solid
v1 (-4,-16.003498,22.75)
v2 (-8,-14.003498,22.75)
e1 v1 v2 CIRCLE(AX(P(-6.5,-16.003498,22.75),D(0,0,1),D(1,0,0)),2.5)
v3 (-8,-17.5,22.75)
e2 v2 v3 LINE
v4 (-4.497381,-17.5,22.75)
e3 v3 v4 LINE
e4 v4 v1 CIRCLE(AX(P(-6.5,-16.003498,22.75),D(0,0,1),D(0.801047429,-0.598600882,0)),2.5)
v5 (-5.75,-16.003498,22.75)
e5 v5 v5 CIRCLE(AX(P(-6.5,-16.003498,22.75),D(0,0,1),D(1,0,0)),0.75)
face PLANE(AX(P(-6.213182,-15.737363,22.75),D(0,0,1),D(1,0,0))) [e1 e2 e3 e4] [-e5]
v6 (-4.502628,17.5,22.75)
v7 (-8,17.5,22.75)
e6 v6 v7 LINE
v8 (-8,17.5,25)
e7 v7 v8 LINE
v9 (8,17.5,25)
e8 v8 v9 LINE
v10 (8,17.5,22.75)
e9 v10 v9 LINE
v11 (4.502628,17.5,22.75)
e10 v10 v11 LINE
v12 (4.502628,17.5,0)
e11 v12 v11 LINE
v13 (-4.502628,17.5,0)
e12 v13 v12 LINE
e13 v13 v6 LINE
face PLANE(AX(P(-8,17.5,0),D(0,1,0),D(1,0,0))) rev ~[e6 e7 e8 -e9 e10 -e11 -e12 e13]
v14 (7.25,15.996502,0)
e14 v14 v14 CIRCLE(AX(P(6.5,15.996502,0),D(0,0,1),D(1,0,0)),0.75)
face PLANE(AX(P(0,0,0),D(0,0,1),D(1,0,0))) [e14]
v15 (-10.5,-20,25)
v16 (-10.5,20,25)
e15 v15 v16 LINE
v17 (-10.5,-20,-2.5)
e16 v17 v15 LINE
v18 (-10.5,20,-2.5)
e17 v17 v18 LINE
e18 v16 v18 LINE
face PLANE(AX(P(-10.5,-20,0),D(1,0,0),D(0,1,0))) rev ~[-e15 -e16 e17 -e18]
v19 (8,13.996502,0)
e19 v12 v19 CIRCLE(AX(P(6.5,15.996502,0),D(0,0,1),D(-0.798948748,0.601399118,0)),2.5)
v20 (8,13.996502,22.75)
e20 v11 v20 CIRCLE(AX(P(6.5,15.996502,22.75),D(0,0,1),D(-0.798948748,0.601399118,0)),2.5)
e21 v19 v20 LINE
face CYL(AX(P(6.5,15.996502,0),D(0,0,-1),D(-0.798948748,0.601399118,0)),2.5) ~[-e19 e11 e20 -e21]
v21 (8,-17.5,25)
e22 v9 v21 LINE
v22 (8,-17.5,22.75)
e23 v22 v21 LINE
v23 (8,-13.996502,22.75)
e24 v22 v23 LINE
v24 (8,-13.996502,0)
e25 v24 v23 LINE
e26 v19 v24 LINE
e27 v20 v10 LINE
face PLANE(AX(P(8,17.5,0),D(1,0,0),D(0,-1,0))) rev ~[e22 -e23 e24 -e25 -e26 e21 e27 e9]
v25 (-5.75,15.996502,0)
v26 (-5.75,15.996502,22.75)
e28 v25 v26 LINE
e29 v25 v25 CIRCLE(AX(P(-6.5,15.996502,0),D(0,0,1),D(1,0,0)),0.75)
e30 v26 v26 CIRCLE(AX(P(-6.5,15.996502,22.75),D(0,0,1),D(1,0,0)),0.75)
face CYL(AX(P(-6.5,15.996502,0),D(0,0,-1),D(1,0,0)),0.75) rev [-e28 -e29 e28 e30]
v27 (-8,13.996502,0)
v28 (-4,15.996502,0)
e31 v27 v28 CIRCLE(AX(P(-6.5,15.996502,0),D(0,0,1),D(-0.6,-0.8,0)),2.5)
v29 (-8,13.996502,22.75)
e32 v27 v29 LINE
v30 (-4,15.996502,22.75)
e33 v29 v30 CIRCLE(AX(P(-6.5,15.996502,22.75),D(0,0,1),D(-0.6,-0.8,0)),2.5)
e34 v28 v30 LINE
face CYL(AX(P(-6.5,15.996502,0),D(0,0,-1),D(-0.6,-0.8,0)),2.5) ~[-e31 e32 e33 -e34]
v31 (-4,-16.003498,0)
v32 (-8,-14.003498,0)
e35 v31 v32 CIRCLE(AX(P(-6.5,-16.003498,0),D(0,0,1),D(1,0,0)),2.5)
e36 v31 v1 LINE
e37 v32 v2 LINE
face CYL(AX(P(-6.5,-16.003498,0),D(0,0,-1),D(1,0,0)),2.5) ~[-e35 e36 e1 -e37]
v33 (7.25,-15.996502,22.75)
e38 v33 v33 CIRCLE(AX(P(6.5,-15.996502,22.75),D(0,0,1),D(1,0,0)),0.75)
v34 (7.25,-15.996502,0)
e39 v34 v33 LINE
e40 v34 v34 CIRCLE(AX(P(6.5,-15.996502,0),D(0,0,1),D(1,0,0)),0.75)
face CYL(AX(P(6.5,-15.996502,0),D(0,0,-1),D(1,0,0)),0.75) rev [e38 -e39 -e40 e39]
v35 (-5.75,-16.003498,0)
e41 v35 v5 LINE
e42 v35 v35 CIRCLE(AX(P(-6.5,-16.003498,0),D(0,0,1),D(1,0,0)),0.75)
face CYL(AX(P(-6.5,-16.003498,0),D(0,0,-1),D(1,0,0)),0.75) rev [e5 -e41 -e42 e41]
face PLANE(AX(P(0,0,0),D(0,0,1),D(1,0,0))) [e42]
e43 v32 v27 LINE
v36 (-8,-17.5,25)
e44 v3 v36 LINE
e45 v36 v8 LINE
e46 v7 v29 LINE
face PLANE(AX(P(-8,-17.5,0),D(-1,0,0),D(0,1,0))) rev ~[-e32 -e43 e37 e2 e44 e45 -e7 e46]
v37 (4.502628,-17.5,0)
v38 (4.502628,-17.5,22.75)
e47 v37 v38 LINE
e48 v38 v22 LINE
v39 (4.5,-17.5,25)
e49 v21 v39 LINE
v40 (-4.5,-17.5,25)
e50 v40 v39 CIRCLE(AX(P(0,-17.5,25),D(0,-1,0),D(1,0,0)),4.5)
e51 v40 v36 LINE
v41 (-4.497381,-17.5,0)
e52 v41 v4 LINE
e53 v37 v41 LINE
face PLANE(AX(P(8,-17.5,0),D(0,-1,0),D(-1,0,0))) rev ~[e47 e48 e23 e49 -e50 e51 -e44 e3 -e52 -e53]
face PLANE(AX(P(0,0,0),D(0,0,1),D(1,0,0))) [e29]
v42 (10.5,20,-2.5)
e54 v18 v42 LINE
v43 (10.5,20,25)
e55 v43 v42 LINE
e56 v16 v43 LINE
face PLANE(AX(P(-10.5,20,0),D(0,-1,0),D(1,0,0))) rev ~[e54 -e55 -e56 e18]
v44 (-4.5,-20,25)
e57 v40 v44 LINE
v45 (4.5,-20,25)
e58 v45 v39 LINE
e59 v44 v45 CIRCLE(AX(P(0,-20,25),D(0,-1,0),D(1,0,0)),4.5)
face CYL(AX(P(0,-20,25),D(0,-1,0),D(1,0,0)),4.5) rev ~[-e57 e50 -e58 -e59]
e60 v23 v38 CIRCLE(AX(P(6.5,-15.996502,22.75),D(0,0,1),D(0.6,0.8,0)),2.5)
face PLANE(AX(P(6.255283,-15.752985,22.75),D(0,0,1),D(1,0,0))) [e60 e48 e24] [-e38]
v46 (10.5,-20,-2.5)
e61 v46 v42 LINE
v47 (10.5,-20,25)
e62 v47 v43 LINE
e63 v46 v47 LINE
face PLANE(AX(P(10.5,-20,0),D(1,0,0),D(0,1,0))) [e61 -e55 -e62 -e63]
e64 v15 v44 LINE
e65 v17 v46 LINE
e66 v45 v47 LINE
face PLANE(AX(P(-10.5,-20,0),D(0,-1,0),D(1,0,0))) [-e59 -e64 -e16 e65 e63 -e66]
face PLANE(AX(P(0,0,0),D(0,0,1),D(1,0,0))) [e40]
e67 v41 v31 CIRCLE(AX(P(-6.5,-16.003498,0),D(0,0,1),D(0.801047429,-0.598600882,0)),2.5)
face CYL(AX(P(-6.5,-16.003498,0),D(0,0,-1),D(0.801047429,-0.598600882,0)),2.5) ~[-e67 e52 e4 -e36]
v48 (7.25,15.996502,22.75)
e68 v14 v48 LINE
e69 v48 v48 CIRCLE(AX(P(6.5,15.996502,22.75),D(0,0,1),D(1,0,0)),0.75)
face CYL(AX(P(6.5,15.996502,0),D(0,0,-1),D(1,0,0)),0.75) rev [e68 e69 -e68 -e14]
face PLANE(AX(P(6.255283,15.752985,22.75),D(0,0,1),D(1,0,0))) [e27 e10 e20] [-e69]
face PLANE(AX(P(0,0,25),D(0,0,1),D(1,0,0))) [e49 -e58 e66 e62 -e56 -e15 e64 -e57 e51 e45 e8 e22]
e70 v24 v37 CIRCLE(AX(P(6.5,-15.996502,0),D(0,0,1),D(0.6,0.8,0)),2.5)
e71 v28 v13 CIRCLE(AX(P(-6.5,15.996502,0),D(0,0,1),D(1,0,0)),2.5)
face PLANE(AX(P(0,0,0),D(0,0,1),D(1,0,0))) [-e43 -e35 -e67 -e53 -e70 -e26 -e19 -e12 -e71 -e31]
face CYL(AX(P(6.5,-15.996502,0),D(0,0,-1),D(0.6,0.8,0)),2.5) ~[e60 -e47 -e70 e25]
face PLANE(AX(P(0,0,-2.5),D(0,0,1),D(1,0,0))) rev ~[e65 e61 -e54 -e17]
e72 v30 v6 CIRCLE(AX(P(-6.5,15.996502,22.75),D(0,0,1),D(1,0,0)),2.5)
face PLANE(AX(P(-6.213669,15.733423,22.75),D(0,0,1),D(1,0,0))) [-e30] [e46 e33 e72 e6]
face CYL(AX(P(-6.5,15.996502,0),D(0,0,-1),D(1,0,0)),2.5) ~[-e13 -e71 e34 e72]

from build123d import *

# Parameters (mm, degrees)
F0_W     = 21
F0_H     = 40
F1_DEPTH = 25
F0_R     = 0.75
F2_DEPTH = 22.75
F3_W     = 21
F3_H     = 40
F4_DEPTH = 2.5
F5_R     = 4.5
F6_DEPTH = 2.5


# Not quite as in the source:
# - a feature names something its author has since deleted; it is built from what else it names


with BuildPart() as f1:
    # F0 (on Top) → F1 (new body)
    with BuildSketch(Plane.XY):
        Rectangle(F0_W, F0_H)
        with BuildLine():
            ThreePointArc((-8, 13.996502206), (-8.2693131131, 17.7627216453), (-4.5026281309, 17.5))
            Line((-4.5026281309, 17.5), (4.5026281309, 17.5))
            ThreePointArc((4.5026281309, 17.5), (7.2926444119, 18.3675177766), (9, 15.996502206))
            ThreePointArc((9, 15.996502206), (8.7360679775, 14.8784682172), (8, 13.996502206))
            Line((8, 13.996502206), (8, -13.9965024172))
            ThreePointArc((8, -13.9965024172), (8.7360679775, -14.8784684285), (9, -15.9965024172))
            ThreePointArc((9, -15.9965024172), (7.2926442865, -18.3675180298), (4.5026279719, -17.5))
            Line((4.5026279719, -17.5), (-4.4973814273, -17.5))
            ThreePointArc((-4.4973814273, -17.5), (-8.2662214687, -17.7728088813), (-8, -14.003497794))
            Line((-8, -14.003497794), (-8, 13.996502206))
        make_face(mode=Mode.SUBTRACT)
        with BuildLine():
            Line((-8, -17.5), (-8, -14.003497794))
            ThreePointArc((-8, -14.003497794), (-8.2662214687, -17.7728088813), (-4.4973814273, -17.5))
            Line((-4.4973814273, -17.5), (-8, -17.5))
        make_face()
        with BuildLine():
            Line((-8, 13.996502206), (-8, 17.5))
            Line((-8, 17.5), (-4.5026281309, 17.5))
            ThreePointArc((-4.5026281309, 17.5), (-8.2693131131, 17.7627216453), (-8, 13.996502206))
        make_face()
        with BuildLine():
            ThreePointArc((9, 15.996502206), (7.2926444119, 18.3675177766), (4.5026281309, 17.5))
            Line((4.5026281309, 17.5), (8, 17.5))
            Line((8, 17.5), (8, 13.996502206))
            ThreePointArc((8, 13.996502206), (8.7360679775, 14.8784682172), (9, 15.996502206))
        make_face()
        with BuildLine():
            ThreePointArc((9, -15.9965024172), (8.7360679775, -14.8784684285), (8, -13.9965024172))
            Line((8, -13.9965024172), (8, -17.5))
            Line((8, -17.5), (4.5026279719, -17.5))
            ThreePointArc((4.5026279719, -17.5), (7.2926442865, -18.3675180298), (9, -15.9965024172))
        make_face()
    extrude(amount=F1_DEPTH)

    # F0 (on Top) → F2 (join)
    with BuildSketch(Plane.XY):
        with BuildLine():
            Line((-4.5026281309, 17.5), (-8, 17.5))
            Line((-8, 17.5), (-8, 13.996502206))
            ThreePointArc((-8, 13.996502206), (-5.3819660113, 13.7604342285), (-4, 15.996502206))
            ThreePointArc((-4, 15.996502206), (-4.1289844293, 16.7891466178), (-4.5026281309, 17.5))
        make_face()
        with Locations((-6.5, 15.996502206)):
            Circle(F0_R, mode=Mode.SUBTRACT)
        with BuildLine():
            Line((8, 17.5), (4.5026281309, 17.5))
            ThreePointArc((4.5026281309, 17.5), (4.7306868869, 14.2302827667), (8, 13.996502206))
            Line((8, 13.996502206), (8, 17.5))
        make_face()
        with Locations((6.5, 15.996502206)):
            Circle(F0_R, mode=Mode.SUBTRACT)
        with BuildLine():
            Line((8, -17.5), (8, -13.9965024172))
            ThreePointArc((8, -13.9965024172), (4.7306869803, -14.2302828844), (4.5026279719, -17.5))
            Line((4.5026279719, -17.5), (8, -17.5))
        make_face()
        with Locations((6.5, -15.9965024172)):
            Circle(F0_R, mode=Mode.SUBTRACT)
        with BuildLine():
            ThreePointArc((-4, -16.003497794), (-5.3819660113, -13.7674298165), (-8, -14.003497794))
            Line((-8, -14.003497794), (-8, -17.5))
            Line((-8, -17.5), (-4.4973814273, -17.5))
            ThreePointArc((-4.4973814273, -17.5), (-4.1276018007, -16.7919943281), (-4, -16.003497794))
        make_face()
        with Locations((-6.5, -16.003497794)):
            Circle(F0_R, mode=Mode.SUBTRACT)
    extrude(amount=F2_DEPTH)

    # F3 (on face) → F4 (join)
    with BuildSketch(Plane.XY):
        Rectangle(F3_W, F3_H)
    extrude(amount=-F4_DEPTH)

    # F5 (on face) → F6 (cut)
    with BuildSketch(Plane.XZ.offset(20)):
        with Locations((0, 25)):
            Circle(F5_R)
    extrude(amount=-F6_DEPTH, mode=Mode.SUBTRACT)


solid = f1.part
